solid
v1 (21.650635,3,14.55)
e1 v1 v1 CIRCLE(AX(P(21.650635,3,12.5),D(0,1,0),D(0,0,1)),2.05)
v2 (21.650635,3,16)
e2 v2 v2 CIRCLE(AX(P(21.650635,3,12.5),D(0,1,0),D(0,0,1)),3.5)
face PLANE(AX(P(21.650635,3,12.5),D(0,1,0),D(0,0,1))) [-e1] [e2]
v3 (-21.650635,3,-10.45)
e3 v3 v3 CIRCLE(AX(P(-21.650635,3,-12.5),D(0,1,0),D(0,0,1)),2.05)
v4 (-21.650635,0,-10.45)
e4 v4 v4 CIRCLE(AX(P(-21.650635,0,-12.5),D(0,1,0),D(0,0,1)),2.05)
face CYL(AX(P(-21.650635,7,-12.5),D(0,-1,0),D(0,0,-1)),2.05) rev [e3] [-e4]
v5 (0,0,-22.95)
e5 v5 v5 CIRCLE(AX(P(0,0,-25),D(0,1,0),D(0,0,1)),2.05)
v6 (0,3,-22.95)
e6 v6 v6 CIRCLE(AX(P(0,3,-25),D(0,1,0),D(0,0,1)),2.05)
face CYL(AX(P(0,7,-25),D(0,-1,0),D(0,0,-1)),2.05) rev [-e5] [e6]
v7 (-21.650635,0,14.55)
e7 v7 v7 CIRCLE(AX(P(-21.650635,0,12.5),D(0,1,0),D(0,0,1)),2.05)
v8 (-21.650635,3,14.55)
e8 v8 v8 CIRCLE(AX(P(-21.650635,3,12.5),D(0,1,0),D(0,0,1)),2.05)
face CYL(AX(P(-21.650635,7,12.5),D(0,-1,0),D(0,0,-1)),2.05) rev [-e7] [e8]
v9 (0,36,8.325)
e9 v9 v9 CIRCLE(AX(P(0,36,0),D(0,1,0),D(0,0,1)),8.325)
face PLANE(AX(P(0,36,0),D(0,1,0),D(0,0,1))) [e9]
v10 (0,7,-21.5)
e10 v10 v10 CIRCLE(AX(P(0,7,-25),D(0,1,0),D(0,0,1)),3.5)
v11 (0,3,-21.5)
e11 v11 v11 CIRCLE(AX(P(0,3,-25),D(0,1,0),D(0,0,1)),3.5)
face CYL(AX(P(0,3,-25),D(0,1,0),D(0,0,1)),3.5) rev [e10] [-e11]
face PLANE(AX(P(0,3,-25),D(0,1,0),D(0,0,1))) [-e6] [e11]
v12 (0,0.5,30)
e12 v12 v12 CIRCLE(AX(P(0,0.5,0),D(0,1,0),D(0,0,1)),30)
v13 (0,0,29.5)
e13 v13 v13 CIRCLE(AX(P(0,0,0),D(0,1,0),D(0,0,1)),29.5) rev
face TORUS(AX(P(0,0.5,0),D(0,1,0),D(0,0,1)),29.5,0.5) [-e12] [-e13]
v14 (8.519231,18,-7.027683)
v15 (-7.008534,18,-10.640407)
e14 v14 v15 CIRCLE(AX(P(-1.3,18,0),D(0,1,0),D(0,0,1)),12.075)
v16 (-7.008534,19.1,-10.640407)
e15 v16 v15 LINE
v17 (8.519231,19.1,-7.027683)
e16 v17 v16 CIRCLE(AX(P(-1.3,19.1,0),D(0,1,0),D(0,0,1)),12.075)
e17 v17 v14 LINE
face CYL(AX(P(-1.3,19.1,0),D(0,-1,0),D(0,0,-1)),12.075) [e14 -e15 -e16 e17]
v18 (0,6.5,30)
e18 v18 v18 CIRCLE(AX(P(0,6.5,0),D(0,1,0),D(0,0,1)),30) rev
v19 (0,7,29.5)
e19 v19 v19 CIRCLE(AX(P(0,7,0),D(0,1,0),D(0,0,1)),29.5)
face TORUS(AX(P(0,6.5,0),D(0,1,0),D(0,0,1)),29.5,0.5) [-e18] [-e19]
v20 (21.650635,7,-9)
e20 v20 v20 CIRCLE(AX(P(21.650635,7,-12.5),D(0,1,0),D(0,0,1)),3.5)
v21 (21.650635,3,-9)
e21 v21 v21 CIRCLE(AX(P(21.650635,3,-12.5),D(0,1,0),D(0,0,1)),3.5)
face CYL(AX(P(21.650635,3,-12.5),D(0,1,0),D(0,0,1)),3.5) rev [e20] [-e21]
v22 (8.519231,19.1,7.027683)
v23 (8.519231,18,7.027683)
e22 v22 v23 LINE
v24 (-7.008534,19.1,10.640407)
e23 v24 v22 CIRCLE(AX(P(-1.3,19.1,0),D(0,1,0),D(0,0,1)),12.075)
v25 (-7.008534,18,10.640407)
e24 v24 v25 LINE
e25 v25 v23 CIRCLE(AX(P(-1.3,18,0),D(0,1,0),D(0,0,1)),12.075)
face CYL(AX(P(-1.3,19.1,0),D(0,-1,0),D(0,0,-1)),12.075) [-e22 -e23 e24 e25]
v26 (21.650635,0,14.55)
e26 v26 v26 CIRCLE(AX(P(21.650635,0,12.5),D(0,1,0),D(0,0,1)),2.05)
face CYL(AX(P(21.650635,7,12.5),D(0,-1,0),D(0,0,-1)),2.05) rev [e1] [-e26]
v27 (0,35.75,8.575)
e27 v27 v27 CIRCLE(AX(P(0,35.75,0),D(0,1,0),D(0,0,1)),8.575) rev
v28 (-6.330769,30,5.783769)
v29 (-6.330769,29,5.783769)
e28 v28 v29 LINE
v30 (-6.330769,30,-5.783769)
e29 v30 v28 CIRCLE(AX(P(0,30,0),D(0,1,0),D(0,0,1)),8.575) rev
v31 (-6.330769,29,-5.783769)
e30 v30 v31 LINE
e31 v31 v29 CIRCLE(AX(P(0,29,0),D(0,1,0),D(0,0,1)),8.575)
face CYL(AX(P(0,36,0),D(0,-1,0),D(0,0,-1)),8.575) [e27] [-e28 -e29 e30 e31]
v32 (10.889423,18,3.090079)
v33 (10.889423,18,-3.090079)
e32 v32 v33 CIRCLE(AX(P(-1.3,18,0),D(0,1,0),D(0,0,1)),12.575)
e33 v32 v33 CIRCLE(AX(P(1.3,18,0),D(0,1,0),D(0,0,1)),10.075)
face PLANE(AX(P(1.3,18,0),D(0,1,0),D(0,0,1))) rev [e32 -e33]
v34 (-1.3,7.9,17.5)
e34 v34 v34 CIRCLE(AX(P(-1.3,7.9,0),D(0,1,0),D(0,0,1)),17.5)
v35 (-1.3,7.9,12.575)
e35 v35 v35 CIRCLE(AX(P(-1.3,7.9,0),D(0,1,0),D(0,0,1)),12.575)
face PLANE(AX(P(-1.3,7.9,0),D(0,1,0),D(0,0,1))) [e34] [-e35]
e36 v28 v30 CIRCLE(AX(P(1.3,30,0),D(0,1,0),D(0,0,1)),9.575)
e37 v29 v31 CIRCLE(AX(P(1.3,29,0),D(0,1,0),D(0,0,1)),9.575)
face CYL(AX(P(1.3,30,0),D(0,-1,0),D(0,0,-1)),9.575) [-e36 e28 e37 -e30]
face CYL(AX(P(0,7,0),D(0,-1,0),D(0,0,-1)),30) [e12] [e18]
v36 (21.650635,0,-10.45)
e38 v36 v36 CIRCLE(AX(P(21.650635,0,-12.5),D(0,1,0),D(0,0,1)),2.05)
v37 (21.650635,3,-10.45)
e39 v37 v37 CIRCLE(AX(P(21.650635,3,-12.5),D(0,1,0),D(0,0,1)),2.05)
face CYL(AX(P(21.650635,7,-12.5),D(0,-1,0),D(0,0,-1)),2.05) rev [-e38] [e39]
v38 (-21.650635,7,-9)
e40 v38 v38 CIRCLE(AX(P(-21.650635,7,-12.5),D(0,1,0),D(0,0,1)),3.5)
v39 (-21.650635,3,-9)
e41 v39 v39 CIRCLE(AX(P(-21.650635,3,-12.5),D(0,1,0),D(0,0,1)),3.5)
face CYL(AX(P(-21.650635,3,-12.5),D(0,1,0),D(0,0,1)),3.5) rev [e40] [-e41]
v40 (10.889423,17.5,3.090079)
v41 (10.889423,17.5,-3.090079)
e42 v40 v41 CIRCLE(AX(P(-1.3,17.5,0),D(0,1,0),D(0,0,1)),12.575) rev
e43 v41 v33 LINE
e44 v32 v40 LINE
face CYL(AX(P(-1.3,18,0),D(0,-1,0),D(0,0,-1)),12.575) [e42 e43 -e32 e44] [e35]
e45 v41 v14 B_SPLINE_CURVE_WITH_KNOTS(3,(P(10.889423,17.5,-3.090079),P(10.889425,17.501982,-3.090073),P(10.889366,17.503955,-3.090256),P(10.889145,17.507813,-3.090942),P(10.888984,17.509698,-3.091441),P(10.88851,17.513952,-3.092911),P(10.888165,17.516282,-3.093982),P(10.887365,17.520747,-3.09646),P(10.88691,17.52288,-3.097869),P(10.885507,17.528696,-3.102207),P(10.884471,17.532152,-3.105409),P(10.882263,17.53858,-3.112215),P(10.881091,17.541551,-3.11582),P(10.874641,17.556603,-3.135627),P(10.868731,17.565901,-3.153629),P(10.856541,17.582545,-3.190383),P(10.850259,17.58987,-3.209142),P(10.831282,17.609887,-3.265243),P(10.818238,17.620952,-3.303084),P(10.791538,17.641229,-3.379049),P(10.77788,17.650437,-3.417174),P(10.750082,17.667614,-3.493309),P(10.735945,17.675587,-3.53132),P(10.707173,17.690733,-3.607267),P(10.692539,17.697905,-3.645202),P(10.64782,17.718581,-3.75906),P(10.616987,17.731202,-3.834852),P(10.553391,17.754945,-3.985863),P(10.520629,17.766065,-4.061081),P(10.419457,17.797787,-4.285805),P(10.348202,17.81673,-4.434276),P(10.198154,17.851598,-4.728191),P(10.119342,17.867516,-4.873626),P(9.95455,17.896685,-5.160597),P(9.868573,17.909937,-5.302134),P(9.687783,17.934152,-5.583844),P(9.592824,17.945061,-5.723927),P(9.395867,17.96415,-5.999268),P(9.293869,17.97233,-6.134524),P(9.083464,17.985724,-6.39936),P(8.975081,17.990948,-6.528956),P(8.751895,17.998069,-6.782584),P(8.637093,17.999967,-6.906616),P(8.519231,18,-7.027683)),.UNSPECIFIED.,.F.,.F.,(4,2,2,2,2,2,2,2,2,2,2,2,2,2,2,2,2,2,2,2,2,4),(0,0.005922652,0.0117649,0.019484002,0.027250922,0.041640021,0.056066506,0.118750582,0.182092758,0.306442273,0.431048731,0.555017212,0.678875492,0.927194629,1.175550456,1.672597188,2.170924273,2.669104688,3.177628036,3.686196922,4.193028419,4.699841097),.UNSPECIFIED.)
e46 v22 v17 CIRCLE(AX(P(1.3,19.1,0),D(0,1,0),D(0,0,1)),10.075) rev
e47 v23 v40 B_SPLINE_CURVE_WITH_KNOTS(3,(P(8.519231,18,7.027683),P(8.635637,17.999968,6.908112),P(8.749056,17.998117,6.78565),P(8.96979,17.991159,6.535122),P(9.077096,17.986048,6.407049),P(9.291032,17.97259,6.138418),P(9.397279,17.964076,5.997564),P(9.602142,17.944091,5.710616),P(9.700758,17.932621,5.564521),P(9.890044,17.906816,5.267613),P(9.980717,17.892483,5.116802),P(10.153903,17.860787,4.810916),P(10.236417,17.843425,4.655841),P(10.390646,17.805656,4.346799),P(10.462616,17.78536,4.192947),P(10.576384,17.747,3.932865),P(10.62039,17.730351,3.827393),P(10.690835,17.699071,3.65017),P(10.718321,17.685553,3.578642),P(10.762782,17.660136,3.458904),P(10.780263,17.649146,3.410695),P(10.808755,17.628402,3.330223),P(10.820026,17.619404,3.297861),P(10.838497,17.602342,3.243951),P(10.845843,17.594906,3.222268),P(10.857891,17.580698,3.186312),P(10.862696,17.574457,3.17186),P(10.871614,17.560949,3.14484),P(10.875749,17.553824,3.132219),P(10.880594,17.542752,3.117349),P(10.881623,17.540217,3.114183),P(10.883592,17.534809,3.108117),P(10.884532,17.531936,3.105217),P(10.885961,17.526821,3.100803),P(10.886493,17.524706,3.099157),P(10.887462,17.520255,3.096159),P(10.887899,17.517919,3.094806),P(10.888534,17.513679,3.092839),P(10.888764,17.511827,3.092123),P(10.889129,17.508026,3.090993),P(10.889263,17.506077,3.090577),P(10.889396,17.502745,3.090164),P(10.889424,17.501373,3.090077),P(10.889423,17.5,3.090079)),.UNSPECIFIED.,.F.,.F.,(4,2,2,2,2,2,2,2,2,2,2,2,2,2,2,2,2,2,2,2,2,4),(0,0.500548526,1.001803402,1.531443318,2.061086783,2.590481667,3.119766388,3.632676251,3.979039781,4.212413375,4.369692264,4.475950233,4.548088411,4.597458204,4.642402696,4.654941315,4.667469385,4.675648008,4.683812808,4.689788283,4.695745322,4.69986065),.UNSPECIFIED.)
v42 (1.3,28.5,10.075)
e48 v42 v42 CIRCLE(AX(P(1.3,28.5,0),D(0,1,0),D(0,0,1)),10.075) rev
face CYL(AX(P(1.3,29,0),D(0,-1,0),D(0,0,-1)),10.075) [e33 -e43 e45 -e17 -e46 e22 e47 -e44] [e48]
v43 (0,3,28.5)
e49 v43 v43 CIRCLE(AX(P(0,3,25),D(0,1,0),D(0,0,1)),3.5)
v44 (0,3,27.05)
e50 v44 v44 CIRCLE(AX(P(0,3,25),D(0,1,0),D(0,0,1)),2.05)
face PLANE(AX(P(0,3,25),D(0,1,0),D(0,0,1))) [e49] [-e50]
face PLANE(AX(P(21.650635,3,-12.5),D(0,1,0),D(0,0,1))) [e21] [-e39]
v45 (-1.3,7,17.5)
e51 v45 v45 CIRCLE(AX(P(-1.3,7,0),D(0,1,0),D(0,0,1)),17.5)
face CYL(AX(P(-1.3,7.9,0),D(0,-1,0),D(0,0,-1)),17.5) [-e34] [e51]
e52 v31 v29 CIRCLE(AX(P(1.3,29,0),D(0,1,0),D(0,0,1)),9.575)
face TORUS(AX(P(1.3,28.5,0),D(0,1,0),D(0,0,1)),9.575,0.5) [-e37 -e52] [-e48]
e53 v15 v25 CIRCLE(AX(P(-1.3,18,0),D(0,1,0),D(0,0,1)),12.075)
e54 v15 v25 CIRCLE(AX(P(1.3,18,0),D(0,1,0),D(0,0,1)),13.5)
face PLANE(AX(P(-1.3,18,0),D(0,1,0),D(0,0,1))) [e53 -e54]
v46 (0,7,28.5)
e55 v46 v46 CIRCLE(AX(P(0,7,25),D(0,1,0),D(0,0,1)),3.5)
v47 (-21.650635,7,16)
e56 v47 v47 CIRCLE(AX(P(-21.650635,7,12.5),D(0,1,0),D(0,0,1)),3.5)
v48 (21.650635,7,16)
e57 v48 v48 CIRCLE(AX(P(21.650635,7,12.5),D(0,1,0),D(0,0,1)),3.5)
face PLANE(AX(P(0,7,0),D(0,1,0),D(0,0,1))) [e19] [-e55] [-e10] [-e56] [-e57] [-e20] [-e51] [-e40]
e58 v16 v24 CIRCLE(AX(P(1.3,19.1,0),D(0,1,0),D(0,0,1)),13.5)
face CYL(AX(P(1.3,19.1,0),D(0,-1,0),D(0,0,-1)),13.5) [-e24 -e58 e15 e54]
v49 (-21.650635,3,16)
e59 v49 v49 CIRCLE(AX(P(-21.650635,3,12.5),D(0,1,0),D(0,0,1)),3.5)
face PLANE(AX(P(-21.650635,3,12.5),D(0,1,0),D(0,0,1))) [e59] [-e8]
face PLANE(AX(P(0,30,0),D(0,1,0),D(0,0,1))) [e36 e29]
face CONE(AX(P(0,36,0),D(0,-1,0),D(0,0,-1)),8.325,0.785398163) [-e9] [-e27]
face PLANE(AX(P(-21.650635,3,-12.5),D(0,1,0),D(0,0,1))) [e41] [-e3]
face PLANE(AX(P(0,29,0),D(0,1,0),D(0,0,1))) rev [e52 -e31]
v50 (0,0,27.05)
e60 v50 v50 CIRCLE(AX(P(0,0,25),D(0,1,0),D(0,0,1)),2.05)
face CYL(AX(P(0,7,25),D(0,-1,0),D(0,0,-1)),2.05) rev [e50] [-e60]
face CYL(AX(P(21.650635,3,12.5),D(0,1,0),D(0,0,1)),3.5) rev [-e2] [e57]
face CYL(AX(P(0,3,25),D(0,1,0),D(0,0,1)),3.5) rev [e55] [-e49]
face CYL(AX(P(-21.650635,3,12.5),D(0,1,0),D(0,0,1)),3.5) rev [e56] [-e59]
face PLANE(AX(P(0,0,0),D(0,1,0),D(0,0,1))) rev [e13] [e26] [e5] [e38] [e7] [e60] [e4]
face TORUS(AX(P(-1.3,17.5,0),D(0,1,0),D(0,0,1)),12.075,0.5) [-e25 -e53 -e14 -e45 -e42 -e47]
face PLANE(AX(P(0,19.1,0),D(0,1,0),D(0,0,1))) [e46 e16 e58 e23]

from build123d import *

# Parameters (mm, degrees)
SKETCH1_R           = 30
SKETCH1_R_2         = 2.05
BOSS_EXTRUDE1_DEPTH = 7
SKETCH2_R           = 12.575
BOSS_EXTRUDE2_DEPTH = 11
SKETCH3_R           = 10.075
BOSS_EXTRUDE3_DEPTH = 11
FILLET1_R           = 0.5
SKETCH4_R           = 3.5
CUT_EXTRUDE1_DEPTH  = 4
SKETCH5_R           = 8.575
BOSS_EXTRUDE4_DEPTH = 7
SKETCH6_R           = 17.5
SKETCH6_R_2         = 12.575
BOSS_EXTRUDE5_DEPTH = 0.9
BOSS_EXTRUDE6_DEPTH = 1.1
CHAMFER1_SIZE       = 0.25
BOSS_EXTRUDE7_DEPTH = 1


with BuildPart() as part:
    # Sketch1 → Boss-Extrude1 (new body)
    with BuildSketch(Plane(origin=(0, 0, 0), x_dir=(1, 0, 0), z_dir=(0, 1, 0))):
        Circle(SKETCH1_R)
        with Locations((0, 25)):
            Circle(SKETCH1_R_2, mode=Mode.SUBTRACT)
        with Locations((21.650635095, 12.5)):
            Circle(SKETCH1_R_2, mode=Mode.SUBTRACT)
        with Locations((21.650635095, -12.5)):
            Circle(SKETCH1_R_2, mode=Mode.SUBTRACT)
        with Locations((0, -25)):
            Circle(SKETCH1_R_2, mode=Mode.SUBTRACT)
        with Locations((-21.650635095, -12.5)):
            Circle(SKETCH1_R_2, mode=Mode.SUBTRACT)
        with Locations((-21.650635095, 12.5)):
            Circle(SKETCH1_R_2, mode=Mode.SUBTRACT)
    extrude(amount=BOSS_EXTRUDE1_DEPTH)

    # Sketch2 → Boss-Extrude2 (add)
    with BuildSketch(Plane(origin=(0, 7, 0), x_dir=(1, 0, 0), z_dir=(0, 1, 0))):
        with Locations((-1.3, 0)):
            Circle(SKETCH2_R)
    extrude(amount=BOSS_EXTRUDE2_DEPTH)

    # Sketch3 → Boss-Extrude3 (add)
    with BuildSketch(Plane(origin=(0, 18, 0), x_dir=(1, 0, 0), z_dir=(0, 1, 0))):
        with Locations((1.3, 0)):
            Circle(SKETCH3_R)
    extrude(amount=BOSS_EXTRUDE3_DEPTH)

    # Fillet1
    fillet1_edges = [part.edges().sort_by_distance(p)[0] for p in [
        (-8.775, 29, 0),
        (-13.875, 18, 0),
        (-30, 0, 0),
        (-30, 7, 0),
    ]]
    fillet(fillet1_edges, radius=FILLET1_R)

    # Sketch4 → Cut-Extrude1 (cut)
    with BuildSketch(Plane(origin=(0, 7, 0), x_dir=(1, 0, 0), z_dir=(0, 1, 0))):
        with Locations((0, 25)):
            Circle(SKETCH4_R)
        with Locations((21.650635095, 12.5)):
            Circle(SKETCH4_R)
        with Locations((21.650635095, -12.5)):
            Circle(SKETCH4_R)
        with Locations((0, -25)):
            Circle(SKETCH4_R)
        with Locations((-21.650635095, -12.5)):
            Circle(SKETCH4_R)
        with Locations((-21.650635095, 12.5)):
            Circle(SKETCH4_R)
    extrude(amount=-CUT_EXTRUDE1_DEPTH, mode=Mode.SUBTRACT)

    # Sketch5 → Boss-Extrude4 (add)
    with BuildSketch(Plane(origin=(0, 29, 0), x_dir=(1, 0, 0), z_dir=(0, 1, 0))):
        Circle(SKETCH5_R)
    extrude(amount=BOSS_EXTRUDE4_DEPTH)

    # Sketch6 → Boss-Extrude5 (add)
    with BuildSketch(Plane(origin=(0, 7, 0), x_dir=(1, 0, 0), z_dir=(0, 1, 0))):
        with Locations((-1.3, 0)):
            Circle(SKETCH6_R)
        with Locations((-1.3, 0)):
            Circle(SKETCH6_R_2, mode=Mode.SUBTRACT)
    extrude(amount=BOSS_EXTRUDE5_DEPTH)

    # Sketch7 → Boss-Extrude6 (add)
    with BuildSketch(Plane(origin=(0, 18, 0), x_dir=(1, 0, 0), z_dir=(0, 1, 0))):
        with BuildLine():
            ThreePointArc((8.519230769, -7.027683267), (-8.775, 0), (8.519230769, 7.027683267))
            ThreePointArc((8.519230769, 7.027683267), (1.436311663, 11.760876816), (-7.008533654, 10.640407348))
            ThreePointArc((-7.008533654, 10.640407348), (-12.2, 0), (-7.008533654, -10.640407348))
            ThreePointArc((-7.008533654, -10.640407348), (1.436311663, -11.760876816), (8.519230769, -7.027683267))
        make_face()
    extrude(amount=BOSS_EXTRUDE6_DEPTH)

    # Chamfer1
    chamfer1_edges = [part.edges().sort_by_distance(p)[0] for p in [
        (-8.575, 36, 0),
    ]]
    chamfer(chamfer1_edges, length=CHAMFER1_SIZE)

    # Sketch8 → Boss-Extrude7 (add)
    with BuildSketch(Plane(origin=(0, 29, 0), x_dir=(1, 0, 0), z_dir=(0, 1, 0))):
        with BuildLine():
            ThreePointArc((-6.330769231, 5.783769182), (3.101957354, 7.994278302), (8.575, 0))
            ThreePointArc((8.575, 0), (3.101957354, -7.994278302), (-6.330769231, -5.783769182))
            ThreePointArc((-6.330769231, -5.783769182), (10.875, 0), (-6.330769231, 5.783769182))
        make_face()
    extrude(amount=BOSS_EXTRUDE7_DEPTH)


solid = part.part
